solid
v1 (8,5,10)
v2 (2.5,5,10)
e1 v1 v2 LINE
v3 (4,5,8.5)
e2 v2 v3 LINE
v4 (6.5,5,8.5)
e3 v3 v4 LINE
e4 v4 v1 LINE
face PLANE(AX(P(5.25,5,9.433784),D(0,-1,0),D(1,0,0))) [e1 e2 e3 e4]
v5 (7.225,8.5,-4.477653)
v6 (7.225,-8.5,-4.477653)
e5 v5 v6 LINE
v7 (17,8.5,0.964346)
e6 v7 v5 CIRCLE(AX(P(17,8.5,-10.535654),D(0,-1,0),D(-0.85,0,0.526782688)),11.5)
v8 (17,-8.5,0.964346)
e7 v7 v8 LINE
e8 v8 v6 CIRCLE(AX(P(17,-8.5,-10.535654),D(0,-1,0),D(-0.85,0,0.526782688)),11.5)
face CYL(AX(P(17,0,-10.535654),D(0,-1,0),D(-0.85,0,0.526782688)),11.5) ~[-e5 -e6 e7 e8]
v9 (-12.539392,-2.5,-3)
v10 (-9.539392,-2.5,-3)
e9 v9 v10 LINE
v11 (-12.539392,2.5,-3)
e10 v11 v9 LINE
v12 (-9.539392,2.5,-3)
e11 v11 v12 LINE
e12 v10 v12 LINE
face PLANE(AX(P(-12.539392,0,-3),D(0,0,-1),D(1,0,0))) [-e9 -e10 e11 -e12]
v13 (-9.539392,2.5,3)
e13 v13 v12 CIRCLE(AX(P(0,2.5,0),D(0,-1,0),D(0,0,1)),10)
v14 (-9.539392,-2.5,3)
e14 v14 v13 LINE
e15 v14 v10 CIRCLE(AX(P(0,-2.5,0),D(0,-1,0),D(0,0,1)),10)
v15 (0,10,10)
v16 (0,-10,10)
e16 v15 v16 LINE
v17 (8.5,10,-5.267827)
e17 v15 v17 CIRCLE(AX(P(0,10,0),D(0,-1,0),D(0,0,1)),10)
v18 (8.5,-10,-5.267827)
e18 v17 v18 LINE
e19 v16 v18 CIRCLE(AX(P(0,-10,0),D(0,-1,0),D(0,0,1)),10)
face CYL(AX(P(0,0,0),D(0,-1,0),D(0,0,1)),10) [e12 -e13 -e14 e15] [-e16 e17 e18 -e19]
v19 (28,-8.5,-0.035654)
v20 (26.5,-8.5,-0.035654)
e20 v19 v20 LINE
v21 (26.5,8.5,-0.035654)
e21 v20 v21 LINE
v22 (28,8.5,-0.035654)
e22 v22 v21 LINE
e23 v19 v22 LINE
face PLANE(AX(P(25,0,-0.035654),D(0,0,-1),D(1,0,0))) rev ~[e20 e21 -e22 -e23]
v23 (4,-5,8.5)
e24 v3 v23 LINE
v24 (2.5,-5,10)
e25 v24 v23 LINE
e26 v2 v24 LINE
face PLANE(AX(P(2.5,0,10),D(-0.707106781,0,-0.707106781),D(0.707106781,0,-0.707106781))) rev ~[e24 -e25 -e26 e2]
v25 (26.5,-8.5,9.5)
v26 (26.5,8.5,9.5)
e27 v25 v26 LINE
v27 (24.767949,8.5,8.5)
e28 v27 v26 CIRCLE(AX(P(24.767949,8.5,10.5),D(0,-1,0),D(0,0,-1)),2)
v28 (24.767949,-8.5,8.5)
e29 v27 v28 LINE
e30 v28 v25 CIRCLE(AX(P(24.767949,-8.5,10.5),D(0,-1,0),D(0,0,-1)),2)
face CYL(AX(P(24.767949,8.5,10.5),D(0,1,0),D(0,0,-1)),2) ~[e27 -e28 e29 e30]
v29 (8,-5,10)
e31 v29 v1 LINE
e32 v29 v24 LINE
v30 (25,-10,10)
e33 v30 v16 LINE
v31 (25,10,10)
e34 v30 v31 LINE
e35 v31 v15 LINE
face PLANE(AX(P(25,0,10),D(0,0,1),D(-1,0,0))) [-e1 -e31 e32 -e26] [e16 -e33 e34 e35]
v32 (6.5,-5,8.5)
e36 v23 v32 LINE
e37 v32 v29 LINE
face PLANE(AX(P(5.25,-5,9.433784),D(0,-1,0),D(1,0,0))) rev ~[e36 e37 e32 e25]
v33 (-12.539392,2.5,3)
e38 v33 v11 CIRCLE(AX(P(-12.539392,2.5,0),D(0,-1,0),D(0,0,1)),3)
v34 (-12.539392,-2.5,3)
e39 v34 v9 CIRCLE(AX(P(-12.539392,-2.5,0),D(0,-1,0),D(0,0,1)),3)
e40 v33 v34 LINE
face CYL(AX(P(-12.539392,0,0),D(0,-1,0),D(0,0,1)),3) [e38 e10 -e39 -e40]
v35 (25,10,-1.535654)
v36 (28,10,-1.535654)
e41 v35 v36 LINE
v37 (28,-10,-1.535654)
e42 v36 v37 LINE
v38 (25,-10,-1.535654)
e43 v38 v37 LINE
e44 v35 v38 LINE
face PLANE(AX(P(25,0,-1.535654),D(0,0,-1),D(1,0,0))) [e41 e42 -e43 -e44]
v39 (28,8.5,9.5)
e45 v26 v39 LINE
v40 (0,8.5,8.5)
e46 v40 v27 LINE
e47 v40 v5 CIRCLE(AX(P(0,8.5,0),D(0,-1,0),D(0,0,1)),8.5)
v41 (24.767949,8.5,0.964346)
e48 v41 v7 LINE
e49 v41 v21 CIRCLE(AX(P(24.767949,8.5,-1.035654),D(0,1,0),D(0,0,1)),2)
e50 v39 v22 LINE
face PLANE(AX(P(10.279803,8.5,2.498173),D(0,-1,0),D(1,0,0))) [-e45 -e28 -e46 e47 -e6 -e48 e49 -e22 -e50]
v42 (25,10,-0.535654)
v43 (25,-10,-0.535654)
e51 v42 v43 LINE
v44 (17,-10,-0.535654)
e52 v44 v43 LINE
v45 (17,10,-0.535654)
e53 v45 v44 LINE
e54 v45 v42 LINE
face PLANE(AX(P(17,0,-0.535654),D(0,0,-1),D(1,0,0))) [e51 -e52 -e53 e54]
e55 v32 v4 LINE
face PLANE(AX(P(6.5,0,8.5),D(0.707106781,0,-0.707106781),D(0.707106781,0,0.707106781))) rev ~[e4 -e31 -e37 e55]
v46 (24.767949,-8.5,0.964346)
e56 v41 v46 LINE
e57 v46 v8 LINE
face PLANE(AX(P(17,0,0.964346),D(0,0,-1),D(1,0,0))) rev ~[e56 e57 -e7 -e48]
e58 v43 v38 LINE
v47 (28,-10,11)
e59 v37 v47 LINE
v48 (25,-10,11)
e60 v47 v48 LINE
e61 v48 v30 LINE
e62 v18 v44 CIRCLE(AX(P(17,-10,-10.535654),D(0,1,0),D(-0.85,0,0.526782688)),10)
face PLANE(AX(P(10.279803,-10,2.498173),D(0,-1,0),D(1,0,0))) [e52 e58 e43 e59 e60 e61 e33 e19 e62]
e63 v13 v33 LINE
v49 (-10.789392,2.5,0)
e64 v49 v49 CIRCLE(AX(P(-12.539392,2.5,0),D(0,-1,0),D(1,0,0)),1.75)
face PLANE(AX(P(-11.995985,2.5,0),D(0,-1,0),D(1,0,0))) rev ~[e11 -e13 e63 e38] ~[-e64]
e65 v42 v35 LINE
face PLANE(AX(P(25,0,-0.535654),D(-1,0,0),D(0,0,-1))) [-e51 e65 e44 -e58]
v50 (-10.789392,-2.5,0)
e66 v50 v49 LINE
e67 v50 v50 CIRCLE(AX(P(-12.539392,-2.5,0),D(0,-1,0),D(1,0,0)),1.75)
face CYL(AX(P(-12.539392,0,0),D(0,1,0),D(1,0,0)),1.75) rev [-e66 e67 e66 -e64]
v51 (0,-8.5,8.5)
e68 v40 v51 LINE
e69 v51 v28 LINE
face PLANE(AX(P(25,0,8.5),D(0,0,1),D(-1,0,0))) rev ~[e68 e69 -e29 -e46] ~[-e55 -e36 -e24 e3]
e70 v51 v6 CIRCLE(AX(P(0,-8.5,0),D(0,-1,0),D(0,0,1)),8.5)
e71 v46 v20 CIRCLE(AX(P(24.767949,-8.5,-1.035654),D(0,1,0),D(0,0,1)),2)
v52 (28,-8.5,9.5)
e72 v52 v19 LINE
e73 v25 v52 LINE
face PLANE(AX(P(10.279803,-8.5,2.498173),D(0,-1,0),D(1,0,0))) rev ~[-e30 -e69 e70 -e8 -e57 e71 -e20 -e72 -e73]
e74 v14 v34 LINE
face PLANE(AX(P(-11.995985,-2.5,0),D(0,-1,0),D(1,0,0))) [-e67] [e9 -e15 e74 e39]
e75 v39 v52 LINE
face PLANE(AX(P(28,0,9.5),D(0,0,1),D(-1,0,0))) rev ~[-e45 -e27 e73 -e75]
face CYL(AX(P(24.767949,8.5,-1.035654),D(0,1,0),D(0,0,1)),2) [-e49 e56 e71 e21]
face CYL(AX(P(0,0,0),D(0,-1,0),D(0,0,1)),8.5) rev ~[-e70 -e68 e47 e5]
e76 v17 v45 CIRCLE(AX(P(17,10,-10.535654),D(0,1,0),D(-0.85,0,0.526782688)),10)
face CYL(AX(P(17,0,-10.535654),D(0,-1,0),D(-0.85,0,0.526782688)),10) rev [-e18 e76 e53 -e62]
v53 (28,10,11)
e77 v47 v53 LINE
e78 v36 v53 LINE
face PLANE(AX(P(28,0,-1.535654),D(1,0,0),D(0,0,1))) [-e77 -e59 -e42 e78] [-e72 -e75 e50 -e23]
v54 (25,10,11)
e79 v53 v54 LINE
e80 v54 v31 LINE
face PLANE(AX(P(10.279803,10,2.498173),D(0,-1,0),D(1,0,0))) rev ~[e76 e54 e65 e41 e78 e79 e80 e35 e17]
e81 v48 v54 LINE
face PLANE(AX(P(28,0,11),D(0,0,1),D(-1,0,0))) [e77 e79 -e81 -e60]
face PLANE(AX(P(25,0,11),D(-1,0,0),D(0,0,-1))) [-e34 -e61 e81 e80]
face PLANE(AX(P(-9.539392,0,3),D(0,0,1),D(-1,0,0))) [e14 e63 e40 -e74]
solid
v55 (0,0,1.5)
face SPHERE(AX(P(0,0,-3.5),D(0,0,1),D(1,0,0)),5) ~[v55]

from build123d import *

# Parameters (mm, degrees)
F1_DEPTH    = 10
F2_T        = -1.5
F4_DEPTH    = 5
F5_R        = 1.75
F6_DEPTH    = 2.5
F9_T1_DEPTH = 17


# Not quite as in the source:
# - a fillet or chamfer that OpenCascade refuses, or shapes differently, is made with other operations: its cross-section is extruded or revolved along the edge and cut away or added


with BuildPart() as f1:
    # F0 (on Front) → F1 (new body, symmetric)
    with BuildSketch(Plane.XZ):
        with BuildLine():
            Line((25, 10), (0, 10))
            ThreePointArc((0, 10), (-8.7372269275, -4.8642435813), (8.5, -5.2678268764))
            ThreePointArc((8.5, -5.2678268764), (12.1357564187, -1.7984268254), (17, -0.5356537529))
            Line((17, -0.5356537529), (25, -0.5356537529))
            Line((25, -0.5356537529), (25, -1.5356537529))
            Line((25, -1.5356537529), (28, -1.5356537529))
            Line((28, -1.5356537529), (28, 11))
            Line((28, 11), (25, 11))
            Line((25, 11), (25, 10))
        make_face()
    extrude(amount=F1_DEPTH, both=True)

    # F2
    f2_openings = [f1.faces().sort_by_distance(p)[0] for p in [
        (28, 0, 4.732173),
    ]]
    offset(amount=F2_T, openings=f2_openings, kind=Kind.INTERSECTION)

    # F3 (on Front) → F4 (cut, symmetric)
    with BuildSketch(Plane.XZ):
        Polygon((8, 10), (2.5, 10), (4, 8.5), (6.5, 8.5), align=None)
    extrude(amount=F4_DEPTH, both=True, mode=Mode.SUBTRACT)

    # F5 (on Front) → F6 (join, symmetric)
    with BuildSketch(Plane.XZ):
        with BuildLine():
            Line((-9.5393920142, 3), (-12.5393920142, 3))
            ThreePointArc((-12.5393920142, 3), (-15.5393920142, 0), (-12.5393920142, -3))
            Line((-12.5393920142, -3), (-9.5393920142, -3))
            Line((-9.5393920142, -3), (-9.5393920142, 3))
        make_face()
        with Locations((-12.5393920142, 0)):
            Circle(F5_R, mode=Mode.SUBTRACT)
    extrude(amount=F6_DEPTH, both=True)

    # F9: fillet of radius 2 on 2 edges, made by hand

    # F9_s2 → F9_t1 (cut)
    with BuildSketch(Plane.XZ.offset(-8.5)):
        with BuildLine():
            ThreePointArc((24.7679491924, 0.9643462471), (25.7679491924, 0.6963970547), (26.5, -0.0356537529))
            Line((26.5, -0.0356537529), (26.5, 0.9643462471))
            Line((26.5, 0.9643462471), (24.7679491924, 0.9643462471))
        make_face()
        with BuildLine():
            ThreePointArc((24.7679491924, 8.5), (25.7679491924, 8.7679491924), (26.5, 9.5))
            Line((26.5, 9.5), (26.5, 8.5))
            Line((26.5, 8.5), (24.7679491924, 8.5))
        make_face()
    extrude(amount=F9_T1_DEPTH, mode=Mode.SUBTRACT)


with BuildPart() as f8:
    # F7 (on Front) → F8 (revolve)
    with BuildSketch(Plane.XZ):
        with BuildLine():
            Line((0, 1.5), (0, -8.5))
            ThreePointArc((0, -8.5), (5, -3.5), (0, 1.5))
        make_face()
    revolve(axis=Axis((0, 0, -3.5), (0, 0, -1)))


solid = Compound([f1.part, f8.part])
